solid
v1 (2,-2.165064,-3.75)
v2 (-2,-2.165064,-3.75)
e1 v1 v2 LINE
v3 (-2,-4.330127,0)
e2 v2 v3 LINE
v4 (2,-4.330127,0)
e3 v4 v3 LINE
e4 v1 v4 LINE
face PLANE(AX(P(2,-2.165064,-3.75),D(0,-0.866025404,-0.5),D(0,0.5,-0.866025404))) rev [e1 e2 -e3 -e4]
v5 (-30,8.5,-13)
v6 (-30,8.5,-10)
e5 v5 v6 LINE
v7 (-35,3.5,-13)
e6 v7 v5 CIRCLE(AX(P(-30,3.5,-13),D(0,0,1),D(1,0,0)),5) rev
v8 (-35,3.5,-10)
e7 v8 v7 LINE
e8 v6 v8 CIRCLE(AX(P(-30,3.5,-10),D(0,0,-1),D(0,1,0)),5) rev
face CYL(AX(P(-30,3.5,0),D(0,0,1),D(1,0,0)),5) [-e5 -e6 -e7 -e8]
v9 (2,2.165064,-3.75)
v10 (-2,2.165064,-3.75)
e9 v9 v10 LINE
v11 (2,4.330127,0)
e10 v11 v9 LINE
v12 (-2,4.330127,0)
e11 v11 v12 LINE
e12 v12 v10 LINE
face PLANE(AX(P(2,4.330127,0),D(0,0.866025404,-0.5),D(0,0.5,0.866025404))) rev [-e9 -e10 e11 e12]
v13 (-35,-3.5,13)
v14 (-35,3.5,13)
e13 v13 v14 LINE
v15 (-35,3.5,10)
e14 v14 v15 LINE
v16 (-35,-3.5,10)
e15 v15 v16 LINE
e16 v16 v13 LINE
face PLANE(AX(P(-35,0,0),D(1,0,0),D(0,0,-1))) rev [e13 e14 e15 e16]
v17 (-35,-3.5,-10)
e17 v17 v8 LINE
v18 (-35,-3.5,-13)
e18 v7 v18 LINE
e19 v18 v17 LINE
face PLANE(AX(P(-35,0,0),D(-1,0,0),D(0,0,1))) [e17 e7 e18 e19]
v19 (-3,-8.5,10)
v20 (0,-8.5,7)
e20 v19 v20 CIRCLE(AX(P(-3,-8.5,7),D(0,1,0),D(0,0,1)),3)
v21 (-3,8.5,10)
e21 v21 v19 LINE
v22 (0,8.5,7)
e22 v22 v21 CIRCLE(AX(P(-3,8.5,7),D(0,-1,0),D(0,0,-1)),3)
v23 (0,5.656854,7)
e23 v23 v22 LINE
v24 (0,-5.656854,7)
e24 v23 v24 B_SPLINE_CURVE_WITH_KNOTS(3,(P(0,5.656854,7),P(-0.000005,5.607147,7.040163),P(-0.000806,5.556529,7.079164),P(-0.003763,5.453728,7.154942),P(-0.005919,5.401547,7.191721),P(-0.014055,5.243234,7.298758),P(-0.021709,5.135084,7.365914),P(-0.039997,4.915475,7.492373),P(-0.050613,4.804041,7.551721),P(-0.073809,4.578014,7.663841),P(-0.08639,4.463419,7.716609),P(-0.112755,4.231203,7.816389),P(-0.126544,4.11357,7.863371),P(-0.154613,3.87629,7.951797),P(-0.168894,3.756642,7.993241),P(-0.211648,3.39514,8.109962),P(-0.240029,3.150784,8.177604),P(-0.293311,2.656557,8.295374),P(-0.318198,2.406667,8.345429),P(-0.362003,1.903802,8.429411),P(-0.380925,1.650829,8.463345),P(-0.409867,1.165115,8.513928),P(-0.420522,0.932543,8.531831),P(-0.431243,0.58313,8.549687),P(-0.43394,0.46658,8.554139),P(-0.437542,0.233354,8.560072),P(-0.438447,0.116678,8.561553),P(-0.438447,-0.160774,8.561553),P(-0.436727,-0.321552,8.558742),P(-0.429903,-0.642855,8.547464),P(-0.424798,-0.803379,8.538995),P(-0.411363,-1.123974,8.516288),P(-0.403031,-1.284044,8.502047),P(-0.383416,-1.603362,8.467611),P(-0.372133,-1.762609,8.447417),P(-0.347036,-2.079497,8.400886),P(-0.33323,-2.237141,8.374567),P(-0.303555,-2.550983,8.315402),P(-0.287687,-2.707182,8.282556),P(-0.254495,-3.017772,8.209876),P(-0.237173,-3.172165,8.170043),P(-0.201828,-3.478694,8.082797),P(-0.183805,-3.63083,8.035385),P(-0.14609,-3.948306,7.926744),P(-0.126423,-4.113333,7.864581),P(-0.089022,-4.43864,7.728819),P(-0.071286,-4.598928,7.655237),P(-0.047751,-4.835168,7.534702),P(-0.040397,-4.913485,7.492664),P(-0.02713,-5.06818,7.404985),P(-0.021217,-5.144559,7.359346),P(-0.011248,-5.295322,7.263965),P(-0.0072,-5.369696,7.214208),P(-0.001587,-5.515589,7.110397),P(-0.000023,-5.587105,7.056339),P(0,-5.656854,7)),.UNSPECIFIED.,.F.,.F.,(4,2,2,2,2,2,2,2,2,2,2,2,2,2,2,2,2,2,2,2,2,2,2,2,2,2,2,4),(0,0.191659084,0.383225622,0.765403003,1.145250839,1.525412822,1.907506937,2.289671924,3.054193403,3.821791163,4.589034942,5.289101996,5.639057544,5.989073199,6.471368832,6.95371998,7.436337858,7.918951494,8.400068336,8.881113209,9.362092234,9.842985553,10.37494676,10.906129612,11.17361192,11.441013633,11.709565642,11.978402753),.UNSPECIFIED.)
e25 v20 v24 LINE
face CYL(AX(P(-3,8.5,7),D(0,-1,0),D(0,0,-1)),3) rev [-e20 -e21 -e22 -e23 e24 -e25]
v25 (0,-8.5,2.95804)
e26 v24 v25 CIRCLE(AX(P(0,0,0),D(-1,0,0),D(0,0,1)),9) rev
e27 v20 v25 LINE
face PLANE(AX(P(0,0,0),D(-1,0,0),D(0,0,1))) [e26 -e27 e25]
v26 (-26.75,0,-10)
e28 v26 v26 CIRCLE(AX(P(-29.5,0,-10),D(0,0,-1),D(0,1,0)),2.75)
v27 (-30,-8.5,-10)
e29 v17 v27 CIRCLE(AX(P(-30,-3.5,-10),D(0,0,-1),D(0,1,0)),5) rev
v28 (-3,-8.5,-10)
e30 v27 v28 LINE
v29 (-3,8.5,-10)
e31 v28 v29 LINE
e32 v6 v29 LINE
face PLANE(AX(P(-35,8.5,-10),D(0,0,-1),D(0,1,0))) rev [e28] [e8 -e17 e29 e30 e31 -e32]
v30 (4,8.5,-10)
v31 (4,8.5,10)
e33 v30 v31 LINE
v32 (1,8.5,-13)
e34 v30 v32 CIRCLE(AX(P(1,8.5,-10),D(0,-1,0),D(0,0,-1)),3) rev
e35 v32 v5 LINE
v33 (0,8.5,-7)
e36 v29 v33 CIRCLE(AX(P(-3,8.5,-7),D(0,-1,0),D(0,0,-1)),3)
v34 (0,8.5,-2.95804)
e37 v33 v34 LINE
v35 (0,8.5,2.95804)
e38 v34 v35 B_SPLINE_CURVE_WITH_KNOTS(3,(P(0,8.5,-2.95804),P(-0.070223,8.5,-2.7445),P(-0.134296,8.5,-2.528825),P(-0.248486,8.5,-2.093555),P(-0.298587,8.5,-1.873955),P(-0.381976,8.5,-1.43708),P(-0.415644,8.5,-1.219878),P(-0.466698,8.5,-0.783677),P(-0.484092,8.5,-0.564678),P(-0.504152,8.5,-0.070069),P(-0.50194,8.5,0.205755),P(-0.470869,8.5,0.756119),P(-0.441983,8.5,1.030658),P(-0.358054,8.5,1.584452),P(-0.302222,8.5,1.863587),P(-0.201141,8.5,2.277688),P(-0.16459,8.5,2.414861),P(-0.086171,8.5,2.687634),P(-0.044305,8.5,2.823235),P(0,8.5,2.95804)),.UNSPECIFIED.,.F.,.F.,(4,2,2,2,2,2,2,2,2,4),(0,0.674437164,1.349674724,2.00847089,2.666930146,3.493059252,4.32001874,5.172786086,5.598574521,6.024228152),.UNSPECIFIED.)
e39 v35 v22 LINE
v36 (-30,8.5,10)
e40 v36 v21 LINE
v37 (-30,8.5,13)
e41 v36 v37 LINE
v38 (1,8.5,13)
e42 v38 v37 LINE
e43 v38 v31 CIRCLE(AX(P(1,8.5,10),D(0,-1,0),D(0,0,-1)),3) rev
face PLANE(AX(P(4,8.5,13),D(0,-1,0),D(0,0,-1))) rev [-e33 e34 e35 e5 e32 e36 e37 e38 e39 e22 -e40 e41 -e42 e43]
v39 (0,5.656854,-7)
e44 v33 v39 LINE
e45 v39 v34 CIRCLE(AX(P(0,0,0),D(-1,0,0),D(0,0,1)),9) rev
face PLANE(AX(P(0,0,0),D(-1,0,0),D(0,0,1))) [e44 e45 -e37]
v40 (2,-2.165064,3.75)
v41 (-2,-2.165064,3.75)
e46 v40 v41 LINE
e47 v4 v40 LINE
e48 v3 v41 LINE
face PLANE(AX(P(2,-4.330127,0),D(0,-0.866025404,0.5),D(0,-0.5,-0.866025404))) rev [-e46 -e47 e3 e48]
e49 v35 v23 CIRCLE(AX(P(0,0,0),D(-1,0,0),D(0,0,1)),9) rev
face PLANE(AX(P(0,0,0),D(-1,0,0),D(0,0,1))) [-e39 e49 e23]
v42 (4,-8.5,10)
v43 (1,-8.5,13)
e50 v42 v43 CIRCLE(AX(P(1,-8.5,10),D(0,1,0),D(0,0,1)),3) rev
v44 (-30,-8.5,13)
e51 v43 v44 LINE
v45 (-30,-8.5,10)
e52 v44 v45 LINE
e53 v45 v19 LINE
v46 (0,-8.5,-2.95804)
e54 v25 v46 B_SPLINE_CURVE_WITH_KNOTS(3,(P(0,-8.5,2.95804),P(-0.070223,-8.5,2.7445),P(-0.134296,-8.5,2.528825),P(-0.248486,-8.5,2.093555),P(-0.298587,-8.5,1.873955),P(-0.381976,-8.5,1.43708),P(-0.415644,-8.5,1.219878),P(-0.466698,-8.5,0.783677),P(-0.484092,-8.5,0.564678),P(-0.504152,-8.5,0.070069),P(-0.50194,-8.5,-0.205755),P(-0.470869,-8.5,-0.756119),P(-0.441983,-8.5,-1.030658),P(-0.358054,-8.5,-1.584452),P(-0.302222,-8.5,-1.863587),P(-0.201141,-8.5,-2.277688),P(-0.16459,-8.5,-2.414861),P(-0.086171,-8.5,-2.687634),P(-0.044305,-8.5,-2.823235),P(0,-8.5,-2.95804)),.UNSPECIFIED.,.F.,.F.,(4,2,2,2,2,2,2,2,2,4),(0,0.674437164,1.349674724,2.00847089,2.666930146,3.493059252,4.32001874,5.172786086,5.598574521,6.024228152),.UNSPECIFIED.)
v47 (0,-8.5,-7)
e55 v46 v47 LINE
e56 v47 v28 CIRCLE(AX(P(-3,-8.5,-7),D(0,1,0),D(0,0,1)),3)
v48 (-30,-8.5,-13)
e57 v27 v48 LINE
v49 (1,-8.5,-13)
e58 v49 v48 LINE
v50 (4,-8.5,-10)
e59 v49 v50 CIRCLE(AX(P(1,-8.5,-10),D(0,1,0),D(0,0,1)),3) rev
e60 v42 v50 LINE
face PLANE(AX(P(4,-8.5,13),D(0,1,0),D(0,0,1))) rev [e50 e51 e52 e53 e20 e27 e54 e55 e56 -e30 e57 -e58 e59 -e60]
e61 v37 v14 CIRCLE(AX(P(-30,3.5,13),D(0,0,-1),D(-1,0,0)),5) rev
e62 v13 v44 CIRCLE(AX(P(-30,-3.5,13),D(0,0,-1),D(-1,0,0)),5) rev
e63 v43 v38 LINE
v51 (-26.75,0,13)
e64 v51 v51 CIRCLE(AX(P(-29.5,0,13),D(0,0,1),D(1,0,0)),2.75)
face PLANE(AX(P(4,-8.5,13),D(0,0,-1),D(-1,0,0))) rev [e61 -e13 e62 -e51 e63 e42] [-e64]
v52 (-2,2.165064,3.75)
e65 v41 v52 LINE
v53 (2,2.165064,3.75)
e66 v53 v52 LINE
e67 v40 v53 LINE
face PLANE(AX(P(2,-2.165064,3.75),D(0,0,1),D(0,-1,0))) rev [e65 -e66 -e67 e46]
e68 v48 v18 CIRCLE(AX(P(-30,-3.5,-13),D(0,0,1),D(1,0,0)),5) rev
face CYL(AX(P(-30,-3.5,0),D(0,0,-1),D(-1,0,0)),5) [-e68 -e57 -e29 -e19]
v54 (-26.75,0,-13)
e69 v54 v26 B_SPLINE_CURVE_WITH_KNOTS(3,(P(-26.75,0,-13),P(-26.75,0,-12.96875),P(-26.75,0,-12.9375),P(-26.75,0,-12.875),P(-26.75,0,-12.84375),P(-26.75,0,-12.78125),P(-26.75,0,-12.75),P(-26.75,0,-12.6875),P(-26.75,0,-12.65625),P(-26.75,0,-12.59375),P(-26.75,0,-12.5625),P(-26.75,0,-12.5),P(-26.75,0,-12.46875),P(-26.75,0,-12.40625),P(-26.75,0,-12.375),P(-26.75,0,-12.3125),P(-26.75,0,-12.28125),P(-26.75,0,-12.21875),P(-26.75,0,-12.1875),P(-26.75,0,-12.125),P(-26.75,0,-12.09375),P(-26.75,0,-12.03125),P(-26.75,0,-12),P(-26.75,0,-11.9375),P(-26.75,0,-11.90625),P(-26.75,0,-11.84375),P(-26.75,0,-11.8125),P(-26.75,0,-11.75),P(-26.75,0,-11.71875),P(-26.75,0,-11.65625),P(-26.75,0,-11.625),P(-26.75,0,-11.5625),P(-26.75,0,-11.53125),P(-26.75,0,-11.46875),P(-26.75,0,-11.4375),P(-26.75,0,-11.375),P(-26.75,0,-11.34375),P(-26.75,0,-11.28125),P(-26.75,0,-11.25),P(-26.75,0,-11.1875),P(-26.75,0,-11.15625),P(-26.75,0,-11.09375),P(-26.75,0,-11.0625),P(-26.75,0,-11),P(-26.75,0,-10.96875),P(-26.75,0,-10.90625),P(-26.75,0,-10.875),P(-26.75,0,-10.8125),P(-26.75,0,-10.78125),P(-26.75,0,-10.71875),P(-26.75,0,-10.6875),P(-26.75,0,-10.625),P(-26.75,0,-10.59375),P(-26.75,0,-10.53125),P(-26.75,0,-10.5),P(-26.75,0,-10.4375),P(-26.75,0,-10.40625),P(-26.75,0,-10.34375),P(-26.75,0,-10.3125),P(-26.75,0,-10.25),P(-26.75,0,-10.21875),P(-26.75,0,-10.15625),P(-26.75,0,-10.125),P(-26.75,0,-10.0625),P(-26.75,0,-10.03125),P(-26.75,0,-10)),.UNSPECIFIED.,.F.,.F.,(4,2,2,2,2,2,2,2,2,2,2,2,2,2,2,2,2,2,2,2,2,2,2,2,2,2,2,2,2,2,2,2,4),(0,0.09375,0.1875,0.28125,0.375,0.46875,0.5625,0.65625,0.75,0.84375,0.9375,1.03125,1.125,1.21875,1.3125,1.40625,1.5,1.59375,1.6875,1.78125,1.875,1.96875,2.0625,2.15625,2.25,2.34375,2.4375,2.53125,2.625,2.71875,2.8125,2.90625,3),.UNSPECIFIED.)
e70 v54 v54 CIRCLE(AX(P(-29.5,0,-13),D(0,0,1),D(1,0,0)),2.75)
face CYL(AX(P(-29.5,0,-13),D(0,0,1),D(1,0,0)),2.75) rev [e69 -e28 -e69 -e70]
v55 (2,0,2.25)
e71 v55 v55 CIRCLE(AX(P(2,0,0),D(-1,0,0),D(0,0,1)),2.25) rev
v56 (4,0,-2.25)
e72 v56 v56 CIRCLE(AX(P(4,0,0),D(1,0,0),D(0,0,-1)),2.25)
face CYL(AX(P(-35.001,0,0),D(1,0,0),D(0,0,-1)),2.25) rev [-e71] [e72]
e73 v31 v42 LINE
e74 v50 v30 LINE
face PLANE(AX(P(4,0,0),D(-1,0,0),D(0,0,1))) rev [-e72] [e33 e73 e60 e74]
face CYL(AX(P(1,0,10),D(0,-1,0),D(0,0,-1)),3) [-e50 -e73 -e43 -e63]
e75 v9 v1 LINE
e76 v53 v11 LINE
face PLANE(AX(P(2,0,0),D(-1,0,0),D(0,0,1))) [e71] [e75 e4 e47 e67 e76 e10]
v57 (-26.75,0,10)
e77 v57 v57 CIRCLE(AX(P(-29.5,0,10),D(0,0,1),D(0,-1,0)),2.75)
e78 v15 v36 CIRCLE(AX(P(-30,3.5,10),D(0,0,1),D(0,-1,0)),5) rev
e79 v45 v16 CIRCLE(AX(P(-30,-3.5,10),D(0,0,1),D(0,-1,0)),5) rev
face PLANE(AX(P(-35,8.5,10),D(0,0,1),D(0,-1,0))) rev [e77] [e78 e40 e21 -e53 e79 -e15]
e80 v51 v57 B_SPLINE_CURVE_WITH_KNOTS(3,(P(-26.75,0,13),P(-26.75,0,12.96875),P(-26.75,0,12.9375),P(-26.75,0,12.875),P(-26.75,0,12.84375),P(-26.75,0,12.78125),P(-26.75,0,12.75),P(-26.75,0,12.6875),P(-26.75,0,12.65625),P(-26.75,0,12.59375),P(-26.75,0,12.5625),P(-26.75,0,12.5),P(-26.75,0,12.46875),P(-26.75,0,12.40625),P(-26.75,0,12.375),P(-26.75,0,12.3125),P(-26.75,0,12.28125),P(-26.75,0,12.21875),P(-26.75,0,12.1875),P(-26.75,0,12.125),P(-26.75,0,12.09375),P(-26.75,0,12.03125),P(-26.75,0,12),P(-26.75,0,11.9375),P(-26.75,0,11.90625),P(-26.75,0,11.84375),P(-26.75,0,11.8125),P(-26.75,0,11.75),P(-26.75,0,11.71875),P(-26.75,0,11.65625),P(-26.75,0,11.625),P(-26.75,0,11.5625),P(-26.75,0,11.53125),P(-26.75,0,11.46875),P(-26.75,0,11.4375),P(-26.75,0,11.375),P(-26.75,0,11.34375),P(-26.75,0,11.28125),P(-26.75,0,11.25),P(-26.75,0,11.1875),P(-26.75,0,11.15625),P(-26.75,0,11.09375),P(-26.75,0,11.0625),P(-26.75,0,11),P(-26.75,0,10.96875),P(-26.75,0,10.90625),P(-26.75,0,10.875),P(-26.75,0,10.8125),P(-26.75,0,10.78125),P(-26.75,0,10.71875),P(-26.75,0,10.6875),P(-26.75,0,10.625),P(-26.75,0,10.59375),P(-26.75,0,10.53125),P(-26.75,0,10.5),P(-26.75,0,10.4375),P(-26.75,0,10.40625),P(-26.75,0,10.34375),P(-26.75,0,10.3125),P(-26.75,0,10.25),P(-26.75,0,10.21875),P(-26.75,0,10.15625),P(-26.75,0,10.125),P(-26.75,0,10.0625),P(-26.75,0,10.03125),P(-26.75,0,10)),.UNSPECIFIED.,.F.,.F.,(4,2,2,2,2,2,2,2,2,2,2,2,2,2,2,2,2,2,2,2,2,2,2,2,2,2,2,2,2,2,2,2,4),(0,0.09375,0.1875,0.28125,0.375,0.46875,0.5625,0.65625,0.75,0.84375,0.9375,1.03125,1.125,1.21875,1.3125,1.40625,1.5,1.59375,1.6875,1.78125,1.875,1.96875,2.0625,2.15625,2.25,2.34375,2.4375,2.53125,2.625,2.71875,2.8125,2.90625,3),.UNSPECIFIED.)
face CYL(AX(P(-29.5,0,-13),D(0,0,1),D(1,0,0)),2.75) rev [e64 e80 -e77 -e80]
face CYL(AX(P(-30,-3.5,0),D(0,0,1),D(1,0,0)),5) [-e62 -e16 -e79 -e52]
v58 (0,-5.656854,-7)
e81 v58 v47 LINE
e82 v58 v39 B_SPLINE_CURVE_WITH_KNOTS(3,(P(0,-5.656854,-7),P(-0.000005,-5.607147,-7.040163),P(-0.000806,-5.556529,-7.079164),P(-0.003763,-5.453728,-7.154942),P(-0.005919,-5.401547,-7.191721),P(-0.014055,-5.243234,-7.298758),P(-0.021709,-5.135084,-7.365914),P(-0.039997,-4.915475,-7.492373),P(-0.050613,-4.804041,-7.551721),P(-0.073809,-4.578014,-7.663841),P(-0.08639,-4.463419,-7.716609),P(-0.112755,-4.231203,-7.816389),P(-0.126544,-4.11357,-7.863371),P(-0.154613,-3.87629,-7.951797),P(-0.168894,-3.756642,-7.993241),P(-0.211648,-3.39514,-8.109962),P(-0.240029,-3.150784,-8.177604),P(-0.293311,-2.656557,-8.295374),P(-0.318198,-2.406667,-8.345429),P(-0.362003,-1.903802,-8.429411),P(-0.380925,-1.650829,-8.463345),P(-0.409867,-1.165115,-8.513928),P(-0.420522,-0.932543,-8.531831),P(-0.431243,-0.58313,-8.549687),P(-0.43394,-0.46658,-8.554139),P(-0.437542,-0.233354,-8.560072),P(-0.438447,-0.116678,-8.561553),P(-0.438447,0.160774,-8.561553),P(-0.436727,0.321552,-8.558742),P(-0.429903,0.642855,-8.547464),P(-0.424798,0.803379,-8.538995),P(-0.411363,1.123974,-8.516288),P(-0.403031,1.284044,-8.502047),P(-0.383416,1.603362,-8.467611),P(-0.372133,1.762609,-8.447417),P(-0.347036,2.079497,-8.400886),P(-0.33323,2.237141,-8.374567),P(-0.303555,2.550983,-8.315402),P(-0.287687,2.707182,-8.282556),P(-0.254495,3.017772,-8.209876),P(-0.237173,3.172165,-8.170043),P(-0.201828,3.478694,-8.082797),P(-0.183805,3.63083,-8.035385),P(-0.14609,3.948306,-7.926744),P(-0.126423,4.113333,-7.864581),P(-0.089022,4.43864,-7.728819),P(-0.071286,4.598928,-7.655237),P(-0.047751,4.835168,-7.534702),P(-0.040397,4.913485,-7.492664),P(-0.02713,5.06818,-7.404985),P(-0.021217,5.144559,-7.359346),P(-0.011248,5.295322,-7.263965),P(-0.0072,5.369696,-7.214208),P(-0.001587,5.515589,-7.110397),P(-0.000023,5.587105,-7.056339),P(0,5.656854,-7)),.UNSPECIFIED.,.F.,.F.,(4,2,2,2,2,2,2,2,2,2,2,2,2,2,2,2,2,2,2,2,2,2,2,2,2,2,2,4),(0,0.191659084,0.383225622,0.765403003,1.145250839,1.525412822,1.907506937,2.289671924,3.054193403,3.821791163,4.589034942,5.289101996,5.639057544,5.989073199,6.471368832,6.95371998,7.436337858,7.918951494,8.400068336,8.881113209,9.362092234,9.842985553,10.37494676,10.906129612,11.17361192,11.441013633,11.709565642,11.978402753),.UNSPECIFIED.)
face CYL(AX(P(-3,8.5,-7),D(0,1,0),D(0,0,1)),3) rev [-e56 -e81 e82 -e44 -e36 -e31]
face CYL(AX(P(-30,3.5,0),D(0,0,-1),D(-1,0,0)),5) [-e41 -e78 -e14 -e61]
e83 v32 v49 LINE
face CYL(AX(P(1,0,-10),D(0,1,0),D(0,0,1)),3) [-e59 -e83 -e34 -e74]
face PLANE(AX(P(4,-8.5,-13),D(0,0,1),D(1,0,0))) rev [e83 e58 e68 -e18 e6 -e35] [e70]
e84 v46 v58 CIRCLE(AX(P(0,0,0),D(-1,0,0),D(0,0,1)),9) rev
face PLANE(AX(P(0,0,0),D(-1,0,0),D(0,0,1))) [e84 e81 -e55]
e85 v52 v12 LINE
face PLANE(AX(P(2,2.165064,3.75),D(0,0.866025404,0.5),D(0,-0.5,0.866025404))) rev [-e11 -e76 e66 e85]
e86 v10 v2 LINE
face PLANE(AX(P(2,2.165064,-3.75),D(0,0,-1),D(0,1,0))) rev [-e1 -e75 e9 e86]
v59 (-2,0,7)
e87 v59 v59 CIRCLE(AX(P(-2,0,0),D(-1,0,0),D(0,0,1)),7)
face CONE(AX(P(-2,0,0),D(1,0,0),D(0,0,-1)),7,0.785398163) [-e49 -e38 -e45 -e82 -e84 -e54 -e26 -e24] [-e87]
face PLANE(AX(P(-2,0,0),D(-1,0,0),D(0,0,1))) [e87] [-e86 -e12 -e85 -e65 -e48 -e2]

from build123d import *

# Parameters (mm, degrees)
SKETCH1_W           = 26
SKETCH1_H           = 17
BOSS_EXTRUDE1_DEPTH = 4
SKETCH2_W           = 3
SKETCH2_H           = 17
BOSS_EXTRUDE2_DEPTH = 35
SKETCH3_R           = 2.75
CUT_EXTRUDE1_DEPTH  = 45.421278685
FILLET1_R           = 3
FILLET2_R           = 5
SKETCH5_R           = 7
BOSS_EXTRUDE3_DEPTH = 2
CUT_EXTRUDE3_REACH  = 43.979
SKETCH7_R           = 2.25
CUT_EXTRUDE4_DEPTH  = 4
CHAMFER1_SIZE       = 2


with BuildPart() as part:
    # Sketch1 → Boss-Extrude1 (new body)
    with BuildSketch(Plane(origin=(0, 0, 0), x_dir=(0, 0, -1), z_dir=(1, 0, 0))):
        Rectangle(SKETCH1_W, SKETCH1_H)
    extrude(amount=BOSS_EXTRUDE1_DEPTH)

    # Sketch2 → Boss-Extrude2 (add)
    with BuildSketch(Plane.ZY):
        with Locations((-11.5, 0)):
            Rectangle(SKETCH2_W, SKETCH2_H)
        with Locations((11.5, 0)):
            Rectangle(SKETCH2_W, SKETCH2_H)
    extrude(amount=BOSS_EXTRUDE2_DEPTH)

    # Sketch3 → Cut-Extrude1 (cut, through all)
    with BuildSketch(Plane.XY.offset(13)):
        with Locations((-29.5, 0)):
            Circle(SKETCH3_R)
    extrude(amount=-CUT_EXTRUDE1_DEPTH, mode=Mode.SUBTRACT)

    # Fillet1
    fillet1_edges = [part.edges().sort_by_distance(p)[0] for p in [
        (4, 0, 13),
        (0, 0, -10),
        (0, 0, 10),
        (4, 0, -13),
    ]]
    fillet(fillet1_edges, radius=FILLET1_R)

    # Fillet2
    fillet2_edges = [part.edges().sort_by_distance(p)[0] for p in [
        (-35, -8.5, -11.5),
        (-35, 8.5, -11.5),
        (-35, 8.5, 11.5),
        (-35, -8.5, 11.5),
    ]]
    fillet(fillet2_edges, radius=FILLET2_R)

    # Sketch5 → Boss-Extrude3 (add)
    with BuildSketch(Plane.ZY):
        Circle(SKETCH5_R)
    extrude(amount=BOSS_EXTRUDE3_DEPTH)

    # Sketch7 → Cut-Extrude3 (cut, up to next)
    with BuildSketch(Plane(origin=(4, 0, 0), x_dir=(0, 0, -1), z_dir=(1, 0, 0)), mode=Mode.PRIVATE) as cut_extrude3_sk1:
        Circle(SKETCH7_R)
    cut_extrude3_tool1 = extrude(cut_extrude3_sk1.sketch, amount=-CUT_EXTRUDE3_REACH, mode=Mode.PRIVATE) & part.part
    add(cut_extrude3_tool1.solids().sort_by_distance((4, 0, 0))[0], mode=Mode.SUBTRACT)

    # Sketch8 → Cut-Extrude4 (cut)
    with BuildSketch(Plane.ZY.offset(2)):
        Polygon((0, 4.330127019), (-3.75, 2.165063509), (-3.75, -2.165063509), (0, -4.330127019), (3.75, -2.165063509), (3.75, 2.165063509), align=None)
    extrude(amount=-CUT_EXTRUDE4_DEPTH, mode=Mode.SUBTRACT)

    # Chamfer1
    # the kernel refuses this chamfer: 2 mm, written as the material it adds along each edge
    with BuildSketch(Plane(origin=(0, 0, 0), x_dir=(0, 0, 1), z_dir=(0, -1, 0))) as chamfer1_piece_1_section:
        Polygon((7 + CHAMFER1_SIZE, 0), (7, CHAMFER1_SIZE), (7, 0), align=None)
    chamfer1_piece_1 = revolve(axis=Axis((0, 0, 0), (-1, 0, 0)), revolution_arc=180, mode=Mode.PRIVATE)
    chamfer1_piece_1 = split(chamfer1_piece_1, bisect_by=Plane(origin=(-0.945270908, 8.5, 0), z_dir=(0, -1, 0)), keep=Keep.TOP, mode=Mode.PRIVATE)
    chamfer1_piece_1 = split(chamfer1_piece_1, bisect_by=Plane(origin=(-2, 8.001839451, 0), z_dir=(1, 0, 0)), keep=Keep.TOP, mode=Mode.PRIVATE)
    add(chamfer1_piece_1)
    with BuildSketch(Plane(origin=(0, 0, 0), x_dir=(0, 0, -1), z_dir=(0, 1, 0))) as chamfer1_piece_2_section:
        Polygon((7 + CHAMFER1_SIZE, 0), (7, CHAMFER1_SIZE), (7, 0), align=None)
    chamfer1_piece_2 = revolve(axis=Axis((0, 0, 0), (-1, 0, 0)), revolution_arc=180, mode=Mode.PRIVATE)
    chamfer1_piece_2 = split(chamfer1_piece_2, bisect_by=Plane(origin=(-0.945270905, -8.5, 0), z_dir=(0, 1, 0)), keep=Keep.TOP, mode=Mode.PRIVATE)
    chamfer1_piece_2 = split(chamfer1_piece_2, bisect_by=Plane(origin=(-2, -8.001839447, 0), z_dir=(1, 0, 0)), keep=Keep.TOP, mode=Mode.PRIVATE)
    add(chamfer1_piece_2)


solid = part.part
